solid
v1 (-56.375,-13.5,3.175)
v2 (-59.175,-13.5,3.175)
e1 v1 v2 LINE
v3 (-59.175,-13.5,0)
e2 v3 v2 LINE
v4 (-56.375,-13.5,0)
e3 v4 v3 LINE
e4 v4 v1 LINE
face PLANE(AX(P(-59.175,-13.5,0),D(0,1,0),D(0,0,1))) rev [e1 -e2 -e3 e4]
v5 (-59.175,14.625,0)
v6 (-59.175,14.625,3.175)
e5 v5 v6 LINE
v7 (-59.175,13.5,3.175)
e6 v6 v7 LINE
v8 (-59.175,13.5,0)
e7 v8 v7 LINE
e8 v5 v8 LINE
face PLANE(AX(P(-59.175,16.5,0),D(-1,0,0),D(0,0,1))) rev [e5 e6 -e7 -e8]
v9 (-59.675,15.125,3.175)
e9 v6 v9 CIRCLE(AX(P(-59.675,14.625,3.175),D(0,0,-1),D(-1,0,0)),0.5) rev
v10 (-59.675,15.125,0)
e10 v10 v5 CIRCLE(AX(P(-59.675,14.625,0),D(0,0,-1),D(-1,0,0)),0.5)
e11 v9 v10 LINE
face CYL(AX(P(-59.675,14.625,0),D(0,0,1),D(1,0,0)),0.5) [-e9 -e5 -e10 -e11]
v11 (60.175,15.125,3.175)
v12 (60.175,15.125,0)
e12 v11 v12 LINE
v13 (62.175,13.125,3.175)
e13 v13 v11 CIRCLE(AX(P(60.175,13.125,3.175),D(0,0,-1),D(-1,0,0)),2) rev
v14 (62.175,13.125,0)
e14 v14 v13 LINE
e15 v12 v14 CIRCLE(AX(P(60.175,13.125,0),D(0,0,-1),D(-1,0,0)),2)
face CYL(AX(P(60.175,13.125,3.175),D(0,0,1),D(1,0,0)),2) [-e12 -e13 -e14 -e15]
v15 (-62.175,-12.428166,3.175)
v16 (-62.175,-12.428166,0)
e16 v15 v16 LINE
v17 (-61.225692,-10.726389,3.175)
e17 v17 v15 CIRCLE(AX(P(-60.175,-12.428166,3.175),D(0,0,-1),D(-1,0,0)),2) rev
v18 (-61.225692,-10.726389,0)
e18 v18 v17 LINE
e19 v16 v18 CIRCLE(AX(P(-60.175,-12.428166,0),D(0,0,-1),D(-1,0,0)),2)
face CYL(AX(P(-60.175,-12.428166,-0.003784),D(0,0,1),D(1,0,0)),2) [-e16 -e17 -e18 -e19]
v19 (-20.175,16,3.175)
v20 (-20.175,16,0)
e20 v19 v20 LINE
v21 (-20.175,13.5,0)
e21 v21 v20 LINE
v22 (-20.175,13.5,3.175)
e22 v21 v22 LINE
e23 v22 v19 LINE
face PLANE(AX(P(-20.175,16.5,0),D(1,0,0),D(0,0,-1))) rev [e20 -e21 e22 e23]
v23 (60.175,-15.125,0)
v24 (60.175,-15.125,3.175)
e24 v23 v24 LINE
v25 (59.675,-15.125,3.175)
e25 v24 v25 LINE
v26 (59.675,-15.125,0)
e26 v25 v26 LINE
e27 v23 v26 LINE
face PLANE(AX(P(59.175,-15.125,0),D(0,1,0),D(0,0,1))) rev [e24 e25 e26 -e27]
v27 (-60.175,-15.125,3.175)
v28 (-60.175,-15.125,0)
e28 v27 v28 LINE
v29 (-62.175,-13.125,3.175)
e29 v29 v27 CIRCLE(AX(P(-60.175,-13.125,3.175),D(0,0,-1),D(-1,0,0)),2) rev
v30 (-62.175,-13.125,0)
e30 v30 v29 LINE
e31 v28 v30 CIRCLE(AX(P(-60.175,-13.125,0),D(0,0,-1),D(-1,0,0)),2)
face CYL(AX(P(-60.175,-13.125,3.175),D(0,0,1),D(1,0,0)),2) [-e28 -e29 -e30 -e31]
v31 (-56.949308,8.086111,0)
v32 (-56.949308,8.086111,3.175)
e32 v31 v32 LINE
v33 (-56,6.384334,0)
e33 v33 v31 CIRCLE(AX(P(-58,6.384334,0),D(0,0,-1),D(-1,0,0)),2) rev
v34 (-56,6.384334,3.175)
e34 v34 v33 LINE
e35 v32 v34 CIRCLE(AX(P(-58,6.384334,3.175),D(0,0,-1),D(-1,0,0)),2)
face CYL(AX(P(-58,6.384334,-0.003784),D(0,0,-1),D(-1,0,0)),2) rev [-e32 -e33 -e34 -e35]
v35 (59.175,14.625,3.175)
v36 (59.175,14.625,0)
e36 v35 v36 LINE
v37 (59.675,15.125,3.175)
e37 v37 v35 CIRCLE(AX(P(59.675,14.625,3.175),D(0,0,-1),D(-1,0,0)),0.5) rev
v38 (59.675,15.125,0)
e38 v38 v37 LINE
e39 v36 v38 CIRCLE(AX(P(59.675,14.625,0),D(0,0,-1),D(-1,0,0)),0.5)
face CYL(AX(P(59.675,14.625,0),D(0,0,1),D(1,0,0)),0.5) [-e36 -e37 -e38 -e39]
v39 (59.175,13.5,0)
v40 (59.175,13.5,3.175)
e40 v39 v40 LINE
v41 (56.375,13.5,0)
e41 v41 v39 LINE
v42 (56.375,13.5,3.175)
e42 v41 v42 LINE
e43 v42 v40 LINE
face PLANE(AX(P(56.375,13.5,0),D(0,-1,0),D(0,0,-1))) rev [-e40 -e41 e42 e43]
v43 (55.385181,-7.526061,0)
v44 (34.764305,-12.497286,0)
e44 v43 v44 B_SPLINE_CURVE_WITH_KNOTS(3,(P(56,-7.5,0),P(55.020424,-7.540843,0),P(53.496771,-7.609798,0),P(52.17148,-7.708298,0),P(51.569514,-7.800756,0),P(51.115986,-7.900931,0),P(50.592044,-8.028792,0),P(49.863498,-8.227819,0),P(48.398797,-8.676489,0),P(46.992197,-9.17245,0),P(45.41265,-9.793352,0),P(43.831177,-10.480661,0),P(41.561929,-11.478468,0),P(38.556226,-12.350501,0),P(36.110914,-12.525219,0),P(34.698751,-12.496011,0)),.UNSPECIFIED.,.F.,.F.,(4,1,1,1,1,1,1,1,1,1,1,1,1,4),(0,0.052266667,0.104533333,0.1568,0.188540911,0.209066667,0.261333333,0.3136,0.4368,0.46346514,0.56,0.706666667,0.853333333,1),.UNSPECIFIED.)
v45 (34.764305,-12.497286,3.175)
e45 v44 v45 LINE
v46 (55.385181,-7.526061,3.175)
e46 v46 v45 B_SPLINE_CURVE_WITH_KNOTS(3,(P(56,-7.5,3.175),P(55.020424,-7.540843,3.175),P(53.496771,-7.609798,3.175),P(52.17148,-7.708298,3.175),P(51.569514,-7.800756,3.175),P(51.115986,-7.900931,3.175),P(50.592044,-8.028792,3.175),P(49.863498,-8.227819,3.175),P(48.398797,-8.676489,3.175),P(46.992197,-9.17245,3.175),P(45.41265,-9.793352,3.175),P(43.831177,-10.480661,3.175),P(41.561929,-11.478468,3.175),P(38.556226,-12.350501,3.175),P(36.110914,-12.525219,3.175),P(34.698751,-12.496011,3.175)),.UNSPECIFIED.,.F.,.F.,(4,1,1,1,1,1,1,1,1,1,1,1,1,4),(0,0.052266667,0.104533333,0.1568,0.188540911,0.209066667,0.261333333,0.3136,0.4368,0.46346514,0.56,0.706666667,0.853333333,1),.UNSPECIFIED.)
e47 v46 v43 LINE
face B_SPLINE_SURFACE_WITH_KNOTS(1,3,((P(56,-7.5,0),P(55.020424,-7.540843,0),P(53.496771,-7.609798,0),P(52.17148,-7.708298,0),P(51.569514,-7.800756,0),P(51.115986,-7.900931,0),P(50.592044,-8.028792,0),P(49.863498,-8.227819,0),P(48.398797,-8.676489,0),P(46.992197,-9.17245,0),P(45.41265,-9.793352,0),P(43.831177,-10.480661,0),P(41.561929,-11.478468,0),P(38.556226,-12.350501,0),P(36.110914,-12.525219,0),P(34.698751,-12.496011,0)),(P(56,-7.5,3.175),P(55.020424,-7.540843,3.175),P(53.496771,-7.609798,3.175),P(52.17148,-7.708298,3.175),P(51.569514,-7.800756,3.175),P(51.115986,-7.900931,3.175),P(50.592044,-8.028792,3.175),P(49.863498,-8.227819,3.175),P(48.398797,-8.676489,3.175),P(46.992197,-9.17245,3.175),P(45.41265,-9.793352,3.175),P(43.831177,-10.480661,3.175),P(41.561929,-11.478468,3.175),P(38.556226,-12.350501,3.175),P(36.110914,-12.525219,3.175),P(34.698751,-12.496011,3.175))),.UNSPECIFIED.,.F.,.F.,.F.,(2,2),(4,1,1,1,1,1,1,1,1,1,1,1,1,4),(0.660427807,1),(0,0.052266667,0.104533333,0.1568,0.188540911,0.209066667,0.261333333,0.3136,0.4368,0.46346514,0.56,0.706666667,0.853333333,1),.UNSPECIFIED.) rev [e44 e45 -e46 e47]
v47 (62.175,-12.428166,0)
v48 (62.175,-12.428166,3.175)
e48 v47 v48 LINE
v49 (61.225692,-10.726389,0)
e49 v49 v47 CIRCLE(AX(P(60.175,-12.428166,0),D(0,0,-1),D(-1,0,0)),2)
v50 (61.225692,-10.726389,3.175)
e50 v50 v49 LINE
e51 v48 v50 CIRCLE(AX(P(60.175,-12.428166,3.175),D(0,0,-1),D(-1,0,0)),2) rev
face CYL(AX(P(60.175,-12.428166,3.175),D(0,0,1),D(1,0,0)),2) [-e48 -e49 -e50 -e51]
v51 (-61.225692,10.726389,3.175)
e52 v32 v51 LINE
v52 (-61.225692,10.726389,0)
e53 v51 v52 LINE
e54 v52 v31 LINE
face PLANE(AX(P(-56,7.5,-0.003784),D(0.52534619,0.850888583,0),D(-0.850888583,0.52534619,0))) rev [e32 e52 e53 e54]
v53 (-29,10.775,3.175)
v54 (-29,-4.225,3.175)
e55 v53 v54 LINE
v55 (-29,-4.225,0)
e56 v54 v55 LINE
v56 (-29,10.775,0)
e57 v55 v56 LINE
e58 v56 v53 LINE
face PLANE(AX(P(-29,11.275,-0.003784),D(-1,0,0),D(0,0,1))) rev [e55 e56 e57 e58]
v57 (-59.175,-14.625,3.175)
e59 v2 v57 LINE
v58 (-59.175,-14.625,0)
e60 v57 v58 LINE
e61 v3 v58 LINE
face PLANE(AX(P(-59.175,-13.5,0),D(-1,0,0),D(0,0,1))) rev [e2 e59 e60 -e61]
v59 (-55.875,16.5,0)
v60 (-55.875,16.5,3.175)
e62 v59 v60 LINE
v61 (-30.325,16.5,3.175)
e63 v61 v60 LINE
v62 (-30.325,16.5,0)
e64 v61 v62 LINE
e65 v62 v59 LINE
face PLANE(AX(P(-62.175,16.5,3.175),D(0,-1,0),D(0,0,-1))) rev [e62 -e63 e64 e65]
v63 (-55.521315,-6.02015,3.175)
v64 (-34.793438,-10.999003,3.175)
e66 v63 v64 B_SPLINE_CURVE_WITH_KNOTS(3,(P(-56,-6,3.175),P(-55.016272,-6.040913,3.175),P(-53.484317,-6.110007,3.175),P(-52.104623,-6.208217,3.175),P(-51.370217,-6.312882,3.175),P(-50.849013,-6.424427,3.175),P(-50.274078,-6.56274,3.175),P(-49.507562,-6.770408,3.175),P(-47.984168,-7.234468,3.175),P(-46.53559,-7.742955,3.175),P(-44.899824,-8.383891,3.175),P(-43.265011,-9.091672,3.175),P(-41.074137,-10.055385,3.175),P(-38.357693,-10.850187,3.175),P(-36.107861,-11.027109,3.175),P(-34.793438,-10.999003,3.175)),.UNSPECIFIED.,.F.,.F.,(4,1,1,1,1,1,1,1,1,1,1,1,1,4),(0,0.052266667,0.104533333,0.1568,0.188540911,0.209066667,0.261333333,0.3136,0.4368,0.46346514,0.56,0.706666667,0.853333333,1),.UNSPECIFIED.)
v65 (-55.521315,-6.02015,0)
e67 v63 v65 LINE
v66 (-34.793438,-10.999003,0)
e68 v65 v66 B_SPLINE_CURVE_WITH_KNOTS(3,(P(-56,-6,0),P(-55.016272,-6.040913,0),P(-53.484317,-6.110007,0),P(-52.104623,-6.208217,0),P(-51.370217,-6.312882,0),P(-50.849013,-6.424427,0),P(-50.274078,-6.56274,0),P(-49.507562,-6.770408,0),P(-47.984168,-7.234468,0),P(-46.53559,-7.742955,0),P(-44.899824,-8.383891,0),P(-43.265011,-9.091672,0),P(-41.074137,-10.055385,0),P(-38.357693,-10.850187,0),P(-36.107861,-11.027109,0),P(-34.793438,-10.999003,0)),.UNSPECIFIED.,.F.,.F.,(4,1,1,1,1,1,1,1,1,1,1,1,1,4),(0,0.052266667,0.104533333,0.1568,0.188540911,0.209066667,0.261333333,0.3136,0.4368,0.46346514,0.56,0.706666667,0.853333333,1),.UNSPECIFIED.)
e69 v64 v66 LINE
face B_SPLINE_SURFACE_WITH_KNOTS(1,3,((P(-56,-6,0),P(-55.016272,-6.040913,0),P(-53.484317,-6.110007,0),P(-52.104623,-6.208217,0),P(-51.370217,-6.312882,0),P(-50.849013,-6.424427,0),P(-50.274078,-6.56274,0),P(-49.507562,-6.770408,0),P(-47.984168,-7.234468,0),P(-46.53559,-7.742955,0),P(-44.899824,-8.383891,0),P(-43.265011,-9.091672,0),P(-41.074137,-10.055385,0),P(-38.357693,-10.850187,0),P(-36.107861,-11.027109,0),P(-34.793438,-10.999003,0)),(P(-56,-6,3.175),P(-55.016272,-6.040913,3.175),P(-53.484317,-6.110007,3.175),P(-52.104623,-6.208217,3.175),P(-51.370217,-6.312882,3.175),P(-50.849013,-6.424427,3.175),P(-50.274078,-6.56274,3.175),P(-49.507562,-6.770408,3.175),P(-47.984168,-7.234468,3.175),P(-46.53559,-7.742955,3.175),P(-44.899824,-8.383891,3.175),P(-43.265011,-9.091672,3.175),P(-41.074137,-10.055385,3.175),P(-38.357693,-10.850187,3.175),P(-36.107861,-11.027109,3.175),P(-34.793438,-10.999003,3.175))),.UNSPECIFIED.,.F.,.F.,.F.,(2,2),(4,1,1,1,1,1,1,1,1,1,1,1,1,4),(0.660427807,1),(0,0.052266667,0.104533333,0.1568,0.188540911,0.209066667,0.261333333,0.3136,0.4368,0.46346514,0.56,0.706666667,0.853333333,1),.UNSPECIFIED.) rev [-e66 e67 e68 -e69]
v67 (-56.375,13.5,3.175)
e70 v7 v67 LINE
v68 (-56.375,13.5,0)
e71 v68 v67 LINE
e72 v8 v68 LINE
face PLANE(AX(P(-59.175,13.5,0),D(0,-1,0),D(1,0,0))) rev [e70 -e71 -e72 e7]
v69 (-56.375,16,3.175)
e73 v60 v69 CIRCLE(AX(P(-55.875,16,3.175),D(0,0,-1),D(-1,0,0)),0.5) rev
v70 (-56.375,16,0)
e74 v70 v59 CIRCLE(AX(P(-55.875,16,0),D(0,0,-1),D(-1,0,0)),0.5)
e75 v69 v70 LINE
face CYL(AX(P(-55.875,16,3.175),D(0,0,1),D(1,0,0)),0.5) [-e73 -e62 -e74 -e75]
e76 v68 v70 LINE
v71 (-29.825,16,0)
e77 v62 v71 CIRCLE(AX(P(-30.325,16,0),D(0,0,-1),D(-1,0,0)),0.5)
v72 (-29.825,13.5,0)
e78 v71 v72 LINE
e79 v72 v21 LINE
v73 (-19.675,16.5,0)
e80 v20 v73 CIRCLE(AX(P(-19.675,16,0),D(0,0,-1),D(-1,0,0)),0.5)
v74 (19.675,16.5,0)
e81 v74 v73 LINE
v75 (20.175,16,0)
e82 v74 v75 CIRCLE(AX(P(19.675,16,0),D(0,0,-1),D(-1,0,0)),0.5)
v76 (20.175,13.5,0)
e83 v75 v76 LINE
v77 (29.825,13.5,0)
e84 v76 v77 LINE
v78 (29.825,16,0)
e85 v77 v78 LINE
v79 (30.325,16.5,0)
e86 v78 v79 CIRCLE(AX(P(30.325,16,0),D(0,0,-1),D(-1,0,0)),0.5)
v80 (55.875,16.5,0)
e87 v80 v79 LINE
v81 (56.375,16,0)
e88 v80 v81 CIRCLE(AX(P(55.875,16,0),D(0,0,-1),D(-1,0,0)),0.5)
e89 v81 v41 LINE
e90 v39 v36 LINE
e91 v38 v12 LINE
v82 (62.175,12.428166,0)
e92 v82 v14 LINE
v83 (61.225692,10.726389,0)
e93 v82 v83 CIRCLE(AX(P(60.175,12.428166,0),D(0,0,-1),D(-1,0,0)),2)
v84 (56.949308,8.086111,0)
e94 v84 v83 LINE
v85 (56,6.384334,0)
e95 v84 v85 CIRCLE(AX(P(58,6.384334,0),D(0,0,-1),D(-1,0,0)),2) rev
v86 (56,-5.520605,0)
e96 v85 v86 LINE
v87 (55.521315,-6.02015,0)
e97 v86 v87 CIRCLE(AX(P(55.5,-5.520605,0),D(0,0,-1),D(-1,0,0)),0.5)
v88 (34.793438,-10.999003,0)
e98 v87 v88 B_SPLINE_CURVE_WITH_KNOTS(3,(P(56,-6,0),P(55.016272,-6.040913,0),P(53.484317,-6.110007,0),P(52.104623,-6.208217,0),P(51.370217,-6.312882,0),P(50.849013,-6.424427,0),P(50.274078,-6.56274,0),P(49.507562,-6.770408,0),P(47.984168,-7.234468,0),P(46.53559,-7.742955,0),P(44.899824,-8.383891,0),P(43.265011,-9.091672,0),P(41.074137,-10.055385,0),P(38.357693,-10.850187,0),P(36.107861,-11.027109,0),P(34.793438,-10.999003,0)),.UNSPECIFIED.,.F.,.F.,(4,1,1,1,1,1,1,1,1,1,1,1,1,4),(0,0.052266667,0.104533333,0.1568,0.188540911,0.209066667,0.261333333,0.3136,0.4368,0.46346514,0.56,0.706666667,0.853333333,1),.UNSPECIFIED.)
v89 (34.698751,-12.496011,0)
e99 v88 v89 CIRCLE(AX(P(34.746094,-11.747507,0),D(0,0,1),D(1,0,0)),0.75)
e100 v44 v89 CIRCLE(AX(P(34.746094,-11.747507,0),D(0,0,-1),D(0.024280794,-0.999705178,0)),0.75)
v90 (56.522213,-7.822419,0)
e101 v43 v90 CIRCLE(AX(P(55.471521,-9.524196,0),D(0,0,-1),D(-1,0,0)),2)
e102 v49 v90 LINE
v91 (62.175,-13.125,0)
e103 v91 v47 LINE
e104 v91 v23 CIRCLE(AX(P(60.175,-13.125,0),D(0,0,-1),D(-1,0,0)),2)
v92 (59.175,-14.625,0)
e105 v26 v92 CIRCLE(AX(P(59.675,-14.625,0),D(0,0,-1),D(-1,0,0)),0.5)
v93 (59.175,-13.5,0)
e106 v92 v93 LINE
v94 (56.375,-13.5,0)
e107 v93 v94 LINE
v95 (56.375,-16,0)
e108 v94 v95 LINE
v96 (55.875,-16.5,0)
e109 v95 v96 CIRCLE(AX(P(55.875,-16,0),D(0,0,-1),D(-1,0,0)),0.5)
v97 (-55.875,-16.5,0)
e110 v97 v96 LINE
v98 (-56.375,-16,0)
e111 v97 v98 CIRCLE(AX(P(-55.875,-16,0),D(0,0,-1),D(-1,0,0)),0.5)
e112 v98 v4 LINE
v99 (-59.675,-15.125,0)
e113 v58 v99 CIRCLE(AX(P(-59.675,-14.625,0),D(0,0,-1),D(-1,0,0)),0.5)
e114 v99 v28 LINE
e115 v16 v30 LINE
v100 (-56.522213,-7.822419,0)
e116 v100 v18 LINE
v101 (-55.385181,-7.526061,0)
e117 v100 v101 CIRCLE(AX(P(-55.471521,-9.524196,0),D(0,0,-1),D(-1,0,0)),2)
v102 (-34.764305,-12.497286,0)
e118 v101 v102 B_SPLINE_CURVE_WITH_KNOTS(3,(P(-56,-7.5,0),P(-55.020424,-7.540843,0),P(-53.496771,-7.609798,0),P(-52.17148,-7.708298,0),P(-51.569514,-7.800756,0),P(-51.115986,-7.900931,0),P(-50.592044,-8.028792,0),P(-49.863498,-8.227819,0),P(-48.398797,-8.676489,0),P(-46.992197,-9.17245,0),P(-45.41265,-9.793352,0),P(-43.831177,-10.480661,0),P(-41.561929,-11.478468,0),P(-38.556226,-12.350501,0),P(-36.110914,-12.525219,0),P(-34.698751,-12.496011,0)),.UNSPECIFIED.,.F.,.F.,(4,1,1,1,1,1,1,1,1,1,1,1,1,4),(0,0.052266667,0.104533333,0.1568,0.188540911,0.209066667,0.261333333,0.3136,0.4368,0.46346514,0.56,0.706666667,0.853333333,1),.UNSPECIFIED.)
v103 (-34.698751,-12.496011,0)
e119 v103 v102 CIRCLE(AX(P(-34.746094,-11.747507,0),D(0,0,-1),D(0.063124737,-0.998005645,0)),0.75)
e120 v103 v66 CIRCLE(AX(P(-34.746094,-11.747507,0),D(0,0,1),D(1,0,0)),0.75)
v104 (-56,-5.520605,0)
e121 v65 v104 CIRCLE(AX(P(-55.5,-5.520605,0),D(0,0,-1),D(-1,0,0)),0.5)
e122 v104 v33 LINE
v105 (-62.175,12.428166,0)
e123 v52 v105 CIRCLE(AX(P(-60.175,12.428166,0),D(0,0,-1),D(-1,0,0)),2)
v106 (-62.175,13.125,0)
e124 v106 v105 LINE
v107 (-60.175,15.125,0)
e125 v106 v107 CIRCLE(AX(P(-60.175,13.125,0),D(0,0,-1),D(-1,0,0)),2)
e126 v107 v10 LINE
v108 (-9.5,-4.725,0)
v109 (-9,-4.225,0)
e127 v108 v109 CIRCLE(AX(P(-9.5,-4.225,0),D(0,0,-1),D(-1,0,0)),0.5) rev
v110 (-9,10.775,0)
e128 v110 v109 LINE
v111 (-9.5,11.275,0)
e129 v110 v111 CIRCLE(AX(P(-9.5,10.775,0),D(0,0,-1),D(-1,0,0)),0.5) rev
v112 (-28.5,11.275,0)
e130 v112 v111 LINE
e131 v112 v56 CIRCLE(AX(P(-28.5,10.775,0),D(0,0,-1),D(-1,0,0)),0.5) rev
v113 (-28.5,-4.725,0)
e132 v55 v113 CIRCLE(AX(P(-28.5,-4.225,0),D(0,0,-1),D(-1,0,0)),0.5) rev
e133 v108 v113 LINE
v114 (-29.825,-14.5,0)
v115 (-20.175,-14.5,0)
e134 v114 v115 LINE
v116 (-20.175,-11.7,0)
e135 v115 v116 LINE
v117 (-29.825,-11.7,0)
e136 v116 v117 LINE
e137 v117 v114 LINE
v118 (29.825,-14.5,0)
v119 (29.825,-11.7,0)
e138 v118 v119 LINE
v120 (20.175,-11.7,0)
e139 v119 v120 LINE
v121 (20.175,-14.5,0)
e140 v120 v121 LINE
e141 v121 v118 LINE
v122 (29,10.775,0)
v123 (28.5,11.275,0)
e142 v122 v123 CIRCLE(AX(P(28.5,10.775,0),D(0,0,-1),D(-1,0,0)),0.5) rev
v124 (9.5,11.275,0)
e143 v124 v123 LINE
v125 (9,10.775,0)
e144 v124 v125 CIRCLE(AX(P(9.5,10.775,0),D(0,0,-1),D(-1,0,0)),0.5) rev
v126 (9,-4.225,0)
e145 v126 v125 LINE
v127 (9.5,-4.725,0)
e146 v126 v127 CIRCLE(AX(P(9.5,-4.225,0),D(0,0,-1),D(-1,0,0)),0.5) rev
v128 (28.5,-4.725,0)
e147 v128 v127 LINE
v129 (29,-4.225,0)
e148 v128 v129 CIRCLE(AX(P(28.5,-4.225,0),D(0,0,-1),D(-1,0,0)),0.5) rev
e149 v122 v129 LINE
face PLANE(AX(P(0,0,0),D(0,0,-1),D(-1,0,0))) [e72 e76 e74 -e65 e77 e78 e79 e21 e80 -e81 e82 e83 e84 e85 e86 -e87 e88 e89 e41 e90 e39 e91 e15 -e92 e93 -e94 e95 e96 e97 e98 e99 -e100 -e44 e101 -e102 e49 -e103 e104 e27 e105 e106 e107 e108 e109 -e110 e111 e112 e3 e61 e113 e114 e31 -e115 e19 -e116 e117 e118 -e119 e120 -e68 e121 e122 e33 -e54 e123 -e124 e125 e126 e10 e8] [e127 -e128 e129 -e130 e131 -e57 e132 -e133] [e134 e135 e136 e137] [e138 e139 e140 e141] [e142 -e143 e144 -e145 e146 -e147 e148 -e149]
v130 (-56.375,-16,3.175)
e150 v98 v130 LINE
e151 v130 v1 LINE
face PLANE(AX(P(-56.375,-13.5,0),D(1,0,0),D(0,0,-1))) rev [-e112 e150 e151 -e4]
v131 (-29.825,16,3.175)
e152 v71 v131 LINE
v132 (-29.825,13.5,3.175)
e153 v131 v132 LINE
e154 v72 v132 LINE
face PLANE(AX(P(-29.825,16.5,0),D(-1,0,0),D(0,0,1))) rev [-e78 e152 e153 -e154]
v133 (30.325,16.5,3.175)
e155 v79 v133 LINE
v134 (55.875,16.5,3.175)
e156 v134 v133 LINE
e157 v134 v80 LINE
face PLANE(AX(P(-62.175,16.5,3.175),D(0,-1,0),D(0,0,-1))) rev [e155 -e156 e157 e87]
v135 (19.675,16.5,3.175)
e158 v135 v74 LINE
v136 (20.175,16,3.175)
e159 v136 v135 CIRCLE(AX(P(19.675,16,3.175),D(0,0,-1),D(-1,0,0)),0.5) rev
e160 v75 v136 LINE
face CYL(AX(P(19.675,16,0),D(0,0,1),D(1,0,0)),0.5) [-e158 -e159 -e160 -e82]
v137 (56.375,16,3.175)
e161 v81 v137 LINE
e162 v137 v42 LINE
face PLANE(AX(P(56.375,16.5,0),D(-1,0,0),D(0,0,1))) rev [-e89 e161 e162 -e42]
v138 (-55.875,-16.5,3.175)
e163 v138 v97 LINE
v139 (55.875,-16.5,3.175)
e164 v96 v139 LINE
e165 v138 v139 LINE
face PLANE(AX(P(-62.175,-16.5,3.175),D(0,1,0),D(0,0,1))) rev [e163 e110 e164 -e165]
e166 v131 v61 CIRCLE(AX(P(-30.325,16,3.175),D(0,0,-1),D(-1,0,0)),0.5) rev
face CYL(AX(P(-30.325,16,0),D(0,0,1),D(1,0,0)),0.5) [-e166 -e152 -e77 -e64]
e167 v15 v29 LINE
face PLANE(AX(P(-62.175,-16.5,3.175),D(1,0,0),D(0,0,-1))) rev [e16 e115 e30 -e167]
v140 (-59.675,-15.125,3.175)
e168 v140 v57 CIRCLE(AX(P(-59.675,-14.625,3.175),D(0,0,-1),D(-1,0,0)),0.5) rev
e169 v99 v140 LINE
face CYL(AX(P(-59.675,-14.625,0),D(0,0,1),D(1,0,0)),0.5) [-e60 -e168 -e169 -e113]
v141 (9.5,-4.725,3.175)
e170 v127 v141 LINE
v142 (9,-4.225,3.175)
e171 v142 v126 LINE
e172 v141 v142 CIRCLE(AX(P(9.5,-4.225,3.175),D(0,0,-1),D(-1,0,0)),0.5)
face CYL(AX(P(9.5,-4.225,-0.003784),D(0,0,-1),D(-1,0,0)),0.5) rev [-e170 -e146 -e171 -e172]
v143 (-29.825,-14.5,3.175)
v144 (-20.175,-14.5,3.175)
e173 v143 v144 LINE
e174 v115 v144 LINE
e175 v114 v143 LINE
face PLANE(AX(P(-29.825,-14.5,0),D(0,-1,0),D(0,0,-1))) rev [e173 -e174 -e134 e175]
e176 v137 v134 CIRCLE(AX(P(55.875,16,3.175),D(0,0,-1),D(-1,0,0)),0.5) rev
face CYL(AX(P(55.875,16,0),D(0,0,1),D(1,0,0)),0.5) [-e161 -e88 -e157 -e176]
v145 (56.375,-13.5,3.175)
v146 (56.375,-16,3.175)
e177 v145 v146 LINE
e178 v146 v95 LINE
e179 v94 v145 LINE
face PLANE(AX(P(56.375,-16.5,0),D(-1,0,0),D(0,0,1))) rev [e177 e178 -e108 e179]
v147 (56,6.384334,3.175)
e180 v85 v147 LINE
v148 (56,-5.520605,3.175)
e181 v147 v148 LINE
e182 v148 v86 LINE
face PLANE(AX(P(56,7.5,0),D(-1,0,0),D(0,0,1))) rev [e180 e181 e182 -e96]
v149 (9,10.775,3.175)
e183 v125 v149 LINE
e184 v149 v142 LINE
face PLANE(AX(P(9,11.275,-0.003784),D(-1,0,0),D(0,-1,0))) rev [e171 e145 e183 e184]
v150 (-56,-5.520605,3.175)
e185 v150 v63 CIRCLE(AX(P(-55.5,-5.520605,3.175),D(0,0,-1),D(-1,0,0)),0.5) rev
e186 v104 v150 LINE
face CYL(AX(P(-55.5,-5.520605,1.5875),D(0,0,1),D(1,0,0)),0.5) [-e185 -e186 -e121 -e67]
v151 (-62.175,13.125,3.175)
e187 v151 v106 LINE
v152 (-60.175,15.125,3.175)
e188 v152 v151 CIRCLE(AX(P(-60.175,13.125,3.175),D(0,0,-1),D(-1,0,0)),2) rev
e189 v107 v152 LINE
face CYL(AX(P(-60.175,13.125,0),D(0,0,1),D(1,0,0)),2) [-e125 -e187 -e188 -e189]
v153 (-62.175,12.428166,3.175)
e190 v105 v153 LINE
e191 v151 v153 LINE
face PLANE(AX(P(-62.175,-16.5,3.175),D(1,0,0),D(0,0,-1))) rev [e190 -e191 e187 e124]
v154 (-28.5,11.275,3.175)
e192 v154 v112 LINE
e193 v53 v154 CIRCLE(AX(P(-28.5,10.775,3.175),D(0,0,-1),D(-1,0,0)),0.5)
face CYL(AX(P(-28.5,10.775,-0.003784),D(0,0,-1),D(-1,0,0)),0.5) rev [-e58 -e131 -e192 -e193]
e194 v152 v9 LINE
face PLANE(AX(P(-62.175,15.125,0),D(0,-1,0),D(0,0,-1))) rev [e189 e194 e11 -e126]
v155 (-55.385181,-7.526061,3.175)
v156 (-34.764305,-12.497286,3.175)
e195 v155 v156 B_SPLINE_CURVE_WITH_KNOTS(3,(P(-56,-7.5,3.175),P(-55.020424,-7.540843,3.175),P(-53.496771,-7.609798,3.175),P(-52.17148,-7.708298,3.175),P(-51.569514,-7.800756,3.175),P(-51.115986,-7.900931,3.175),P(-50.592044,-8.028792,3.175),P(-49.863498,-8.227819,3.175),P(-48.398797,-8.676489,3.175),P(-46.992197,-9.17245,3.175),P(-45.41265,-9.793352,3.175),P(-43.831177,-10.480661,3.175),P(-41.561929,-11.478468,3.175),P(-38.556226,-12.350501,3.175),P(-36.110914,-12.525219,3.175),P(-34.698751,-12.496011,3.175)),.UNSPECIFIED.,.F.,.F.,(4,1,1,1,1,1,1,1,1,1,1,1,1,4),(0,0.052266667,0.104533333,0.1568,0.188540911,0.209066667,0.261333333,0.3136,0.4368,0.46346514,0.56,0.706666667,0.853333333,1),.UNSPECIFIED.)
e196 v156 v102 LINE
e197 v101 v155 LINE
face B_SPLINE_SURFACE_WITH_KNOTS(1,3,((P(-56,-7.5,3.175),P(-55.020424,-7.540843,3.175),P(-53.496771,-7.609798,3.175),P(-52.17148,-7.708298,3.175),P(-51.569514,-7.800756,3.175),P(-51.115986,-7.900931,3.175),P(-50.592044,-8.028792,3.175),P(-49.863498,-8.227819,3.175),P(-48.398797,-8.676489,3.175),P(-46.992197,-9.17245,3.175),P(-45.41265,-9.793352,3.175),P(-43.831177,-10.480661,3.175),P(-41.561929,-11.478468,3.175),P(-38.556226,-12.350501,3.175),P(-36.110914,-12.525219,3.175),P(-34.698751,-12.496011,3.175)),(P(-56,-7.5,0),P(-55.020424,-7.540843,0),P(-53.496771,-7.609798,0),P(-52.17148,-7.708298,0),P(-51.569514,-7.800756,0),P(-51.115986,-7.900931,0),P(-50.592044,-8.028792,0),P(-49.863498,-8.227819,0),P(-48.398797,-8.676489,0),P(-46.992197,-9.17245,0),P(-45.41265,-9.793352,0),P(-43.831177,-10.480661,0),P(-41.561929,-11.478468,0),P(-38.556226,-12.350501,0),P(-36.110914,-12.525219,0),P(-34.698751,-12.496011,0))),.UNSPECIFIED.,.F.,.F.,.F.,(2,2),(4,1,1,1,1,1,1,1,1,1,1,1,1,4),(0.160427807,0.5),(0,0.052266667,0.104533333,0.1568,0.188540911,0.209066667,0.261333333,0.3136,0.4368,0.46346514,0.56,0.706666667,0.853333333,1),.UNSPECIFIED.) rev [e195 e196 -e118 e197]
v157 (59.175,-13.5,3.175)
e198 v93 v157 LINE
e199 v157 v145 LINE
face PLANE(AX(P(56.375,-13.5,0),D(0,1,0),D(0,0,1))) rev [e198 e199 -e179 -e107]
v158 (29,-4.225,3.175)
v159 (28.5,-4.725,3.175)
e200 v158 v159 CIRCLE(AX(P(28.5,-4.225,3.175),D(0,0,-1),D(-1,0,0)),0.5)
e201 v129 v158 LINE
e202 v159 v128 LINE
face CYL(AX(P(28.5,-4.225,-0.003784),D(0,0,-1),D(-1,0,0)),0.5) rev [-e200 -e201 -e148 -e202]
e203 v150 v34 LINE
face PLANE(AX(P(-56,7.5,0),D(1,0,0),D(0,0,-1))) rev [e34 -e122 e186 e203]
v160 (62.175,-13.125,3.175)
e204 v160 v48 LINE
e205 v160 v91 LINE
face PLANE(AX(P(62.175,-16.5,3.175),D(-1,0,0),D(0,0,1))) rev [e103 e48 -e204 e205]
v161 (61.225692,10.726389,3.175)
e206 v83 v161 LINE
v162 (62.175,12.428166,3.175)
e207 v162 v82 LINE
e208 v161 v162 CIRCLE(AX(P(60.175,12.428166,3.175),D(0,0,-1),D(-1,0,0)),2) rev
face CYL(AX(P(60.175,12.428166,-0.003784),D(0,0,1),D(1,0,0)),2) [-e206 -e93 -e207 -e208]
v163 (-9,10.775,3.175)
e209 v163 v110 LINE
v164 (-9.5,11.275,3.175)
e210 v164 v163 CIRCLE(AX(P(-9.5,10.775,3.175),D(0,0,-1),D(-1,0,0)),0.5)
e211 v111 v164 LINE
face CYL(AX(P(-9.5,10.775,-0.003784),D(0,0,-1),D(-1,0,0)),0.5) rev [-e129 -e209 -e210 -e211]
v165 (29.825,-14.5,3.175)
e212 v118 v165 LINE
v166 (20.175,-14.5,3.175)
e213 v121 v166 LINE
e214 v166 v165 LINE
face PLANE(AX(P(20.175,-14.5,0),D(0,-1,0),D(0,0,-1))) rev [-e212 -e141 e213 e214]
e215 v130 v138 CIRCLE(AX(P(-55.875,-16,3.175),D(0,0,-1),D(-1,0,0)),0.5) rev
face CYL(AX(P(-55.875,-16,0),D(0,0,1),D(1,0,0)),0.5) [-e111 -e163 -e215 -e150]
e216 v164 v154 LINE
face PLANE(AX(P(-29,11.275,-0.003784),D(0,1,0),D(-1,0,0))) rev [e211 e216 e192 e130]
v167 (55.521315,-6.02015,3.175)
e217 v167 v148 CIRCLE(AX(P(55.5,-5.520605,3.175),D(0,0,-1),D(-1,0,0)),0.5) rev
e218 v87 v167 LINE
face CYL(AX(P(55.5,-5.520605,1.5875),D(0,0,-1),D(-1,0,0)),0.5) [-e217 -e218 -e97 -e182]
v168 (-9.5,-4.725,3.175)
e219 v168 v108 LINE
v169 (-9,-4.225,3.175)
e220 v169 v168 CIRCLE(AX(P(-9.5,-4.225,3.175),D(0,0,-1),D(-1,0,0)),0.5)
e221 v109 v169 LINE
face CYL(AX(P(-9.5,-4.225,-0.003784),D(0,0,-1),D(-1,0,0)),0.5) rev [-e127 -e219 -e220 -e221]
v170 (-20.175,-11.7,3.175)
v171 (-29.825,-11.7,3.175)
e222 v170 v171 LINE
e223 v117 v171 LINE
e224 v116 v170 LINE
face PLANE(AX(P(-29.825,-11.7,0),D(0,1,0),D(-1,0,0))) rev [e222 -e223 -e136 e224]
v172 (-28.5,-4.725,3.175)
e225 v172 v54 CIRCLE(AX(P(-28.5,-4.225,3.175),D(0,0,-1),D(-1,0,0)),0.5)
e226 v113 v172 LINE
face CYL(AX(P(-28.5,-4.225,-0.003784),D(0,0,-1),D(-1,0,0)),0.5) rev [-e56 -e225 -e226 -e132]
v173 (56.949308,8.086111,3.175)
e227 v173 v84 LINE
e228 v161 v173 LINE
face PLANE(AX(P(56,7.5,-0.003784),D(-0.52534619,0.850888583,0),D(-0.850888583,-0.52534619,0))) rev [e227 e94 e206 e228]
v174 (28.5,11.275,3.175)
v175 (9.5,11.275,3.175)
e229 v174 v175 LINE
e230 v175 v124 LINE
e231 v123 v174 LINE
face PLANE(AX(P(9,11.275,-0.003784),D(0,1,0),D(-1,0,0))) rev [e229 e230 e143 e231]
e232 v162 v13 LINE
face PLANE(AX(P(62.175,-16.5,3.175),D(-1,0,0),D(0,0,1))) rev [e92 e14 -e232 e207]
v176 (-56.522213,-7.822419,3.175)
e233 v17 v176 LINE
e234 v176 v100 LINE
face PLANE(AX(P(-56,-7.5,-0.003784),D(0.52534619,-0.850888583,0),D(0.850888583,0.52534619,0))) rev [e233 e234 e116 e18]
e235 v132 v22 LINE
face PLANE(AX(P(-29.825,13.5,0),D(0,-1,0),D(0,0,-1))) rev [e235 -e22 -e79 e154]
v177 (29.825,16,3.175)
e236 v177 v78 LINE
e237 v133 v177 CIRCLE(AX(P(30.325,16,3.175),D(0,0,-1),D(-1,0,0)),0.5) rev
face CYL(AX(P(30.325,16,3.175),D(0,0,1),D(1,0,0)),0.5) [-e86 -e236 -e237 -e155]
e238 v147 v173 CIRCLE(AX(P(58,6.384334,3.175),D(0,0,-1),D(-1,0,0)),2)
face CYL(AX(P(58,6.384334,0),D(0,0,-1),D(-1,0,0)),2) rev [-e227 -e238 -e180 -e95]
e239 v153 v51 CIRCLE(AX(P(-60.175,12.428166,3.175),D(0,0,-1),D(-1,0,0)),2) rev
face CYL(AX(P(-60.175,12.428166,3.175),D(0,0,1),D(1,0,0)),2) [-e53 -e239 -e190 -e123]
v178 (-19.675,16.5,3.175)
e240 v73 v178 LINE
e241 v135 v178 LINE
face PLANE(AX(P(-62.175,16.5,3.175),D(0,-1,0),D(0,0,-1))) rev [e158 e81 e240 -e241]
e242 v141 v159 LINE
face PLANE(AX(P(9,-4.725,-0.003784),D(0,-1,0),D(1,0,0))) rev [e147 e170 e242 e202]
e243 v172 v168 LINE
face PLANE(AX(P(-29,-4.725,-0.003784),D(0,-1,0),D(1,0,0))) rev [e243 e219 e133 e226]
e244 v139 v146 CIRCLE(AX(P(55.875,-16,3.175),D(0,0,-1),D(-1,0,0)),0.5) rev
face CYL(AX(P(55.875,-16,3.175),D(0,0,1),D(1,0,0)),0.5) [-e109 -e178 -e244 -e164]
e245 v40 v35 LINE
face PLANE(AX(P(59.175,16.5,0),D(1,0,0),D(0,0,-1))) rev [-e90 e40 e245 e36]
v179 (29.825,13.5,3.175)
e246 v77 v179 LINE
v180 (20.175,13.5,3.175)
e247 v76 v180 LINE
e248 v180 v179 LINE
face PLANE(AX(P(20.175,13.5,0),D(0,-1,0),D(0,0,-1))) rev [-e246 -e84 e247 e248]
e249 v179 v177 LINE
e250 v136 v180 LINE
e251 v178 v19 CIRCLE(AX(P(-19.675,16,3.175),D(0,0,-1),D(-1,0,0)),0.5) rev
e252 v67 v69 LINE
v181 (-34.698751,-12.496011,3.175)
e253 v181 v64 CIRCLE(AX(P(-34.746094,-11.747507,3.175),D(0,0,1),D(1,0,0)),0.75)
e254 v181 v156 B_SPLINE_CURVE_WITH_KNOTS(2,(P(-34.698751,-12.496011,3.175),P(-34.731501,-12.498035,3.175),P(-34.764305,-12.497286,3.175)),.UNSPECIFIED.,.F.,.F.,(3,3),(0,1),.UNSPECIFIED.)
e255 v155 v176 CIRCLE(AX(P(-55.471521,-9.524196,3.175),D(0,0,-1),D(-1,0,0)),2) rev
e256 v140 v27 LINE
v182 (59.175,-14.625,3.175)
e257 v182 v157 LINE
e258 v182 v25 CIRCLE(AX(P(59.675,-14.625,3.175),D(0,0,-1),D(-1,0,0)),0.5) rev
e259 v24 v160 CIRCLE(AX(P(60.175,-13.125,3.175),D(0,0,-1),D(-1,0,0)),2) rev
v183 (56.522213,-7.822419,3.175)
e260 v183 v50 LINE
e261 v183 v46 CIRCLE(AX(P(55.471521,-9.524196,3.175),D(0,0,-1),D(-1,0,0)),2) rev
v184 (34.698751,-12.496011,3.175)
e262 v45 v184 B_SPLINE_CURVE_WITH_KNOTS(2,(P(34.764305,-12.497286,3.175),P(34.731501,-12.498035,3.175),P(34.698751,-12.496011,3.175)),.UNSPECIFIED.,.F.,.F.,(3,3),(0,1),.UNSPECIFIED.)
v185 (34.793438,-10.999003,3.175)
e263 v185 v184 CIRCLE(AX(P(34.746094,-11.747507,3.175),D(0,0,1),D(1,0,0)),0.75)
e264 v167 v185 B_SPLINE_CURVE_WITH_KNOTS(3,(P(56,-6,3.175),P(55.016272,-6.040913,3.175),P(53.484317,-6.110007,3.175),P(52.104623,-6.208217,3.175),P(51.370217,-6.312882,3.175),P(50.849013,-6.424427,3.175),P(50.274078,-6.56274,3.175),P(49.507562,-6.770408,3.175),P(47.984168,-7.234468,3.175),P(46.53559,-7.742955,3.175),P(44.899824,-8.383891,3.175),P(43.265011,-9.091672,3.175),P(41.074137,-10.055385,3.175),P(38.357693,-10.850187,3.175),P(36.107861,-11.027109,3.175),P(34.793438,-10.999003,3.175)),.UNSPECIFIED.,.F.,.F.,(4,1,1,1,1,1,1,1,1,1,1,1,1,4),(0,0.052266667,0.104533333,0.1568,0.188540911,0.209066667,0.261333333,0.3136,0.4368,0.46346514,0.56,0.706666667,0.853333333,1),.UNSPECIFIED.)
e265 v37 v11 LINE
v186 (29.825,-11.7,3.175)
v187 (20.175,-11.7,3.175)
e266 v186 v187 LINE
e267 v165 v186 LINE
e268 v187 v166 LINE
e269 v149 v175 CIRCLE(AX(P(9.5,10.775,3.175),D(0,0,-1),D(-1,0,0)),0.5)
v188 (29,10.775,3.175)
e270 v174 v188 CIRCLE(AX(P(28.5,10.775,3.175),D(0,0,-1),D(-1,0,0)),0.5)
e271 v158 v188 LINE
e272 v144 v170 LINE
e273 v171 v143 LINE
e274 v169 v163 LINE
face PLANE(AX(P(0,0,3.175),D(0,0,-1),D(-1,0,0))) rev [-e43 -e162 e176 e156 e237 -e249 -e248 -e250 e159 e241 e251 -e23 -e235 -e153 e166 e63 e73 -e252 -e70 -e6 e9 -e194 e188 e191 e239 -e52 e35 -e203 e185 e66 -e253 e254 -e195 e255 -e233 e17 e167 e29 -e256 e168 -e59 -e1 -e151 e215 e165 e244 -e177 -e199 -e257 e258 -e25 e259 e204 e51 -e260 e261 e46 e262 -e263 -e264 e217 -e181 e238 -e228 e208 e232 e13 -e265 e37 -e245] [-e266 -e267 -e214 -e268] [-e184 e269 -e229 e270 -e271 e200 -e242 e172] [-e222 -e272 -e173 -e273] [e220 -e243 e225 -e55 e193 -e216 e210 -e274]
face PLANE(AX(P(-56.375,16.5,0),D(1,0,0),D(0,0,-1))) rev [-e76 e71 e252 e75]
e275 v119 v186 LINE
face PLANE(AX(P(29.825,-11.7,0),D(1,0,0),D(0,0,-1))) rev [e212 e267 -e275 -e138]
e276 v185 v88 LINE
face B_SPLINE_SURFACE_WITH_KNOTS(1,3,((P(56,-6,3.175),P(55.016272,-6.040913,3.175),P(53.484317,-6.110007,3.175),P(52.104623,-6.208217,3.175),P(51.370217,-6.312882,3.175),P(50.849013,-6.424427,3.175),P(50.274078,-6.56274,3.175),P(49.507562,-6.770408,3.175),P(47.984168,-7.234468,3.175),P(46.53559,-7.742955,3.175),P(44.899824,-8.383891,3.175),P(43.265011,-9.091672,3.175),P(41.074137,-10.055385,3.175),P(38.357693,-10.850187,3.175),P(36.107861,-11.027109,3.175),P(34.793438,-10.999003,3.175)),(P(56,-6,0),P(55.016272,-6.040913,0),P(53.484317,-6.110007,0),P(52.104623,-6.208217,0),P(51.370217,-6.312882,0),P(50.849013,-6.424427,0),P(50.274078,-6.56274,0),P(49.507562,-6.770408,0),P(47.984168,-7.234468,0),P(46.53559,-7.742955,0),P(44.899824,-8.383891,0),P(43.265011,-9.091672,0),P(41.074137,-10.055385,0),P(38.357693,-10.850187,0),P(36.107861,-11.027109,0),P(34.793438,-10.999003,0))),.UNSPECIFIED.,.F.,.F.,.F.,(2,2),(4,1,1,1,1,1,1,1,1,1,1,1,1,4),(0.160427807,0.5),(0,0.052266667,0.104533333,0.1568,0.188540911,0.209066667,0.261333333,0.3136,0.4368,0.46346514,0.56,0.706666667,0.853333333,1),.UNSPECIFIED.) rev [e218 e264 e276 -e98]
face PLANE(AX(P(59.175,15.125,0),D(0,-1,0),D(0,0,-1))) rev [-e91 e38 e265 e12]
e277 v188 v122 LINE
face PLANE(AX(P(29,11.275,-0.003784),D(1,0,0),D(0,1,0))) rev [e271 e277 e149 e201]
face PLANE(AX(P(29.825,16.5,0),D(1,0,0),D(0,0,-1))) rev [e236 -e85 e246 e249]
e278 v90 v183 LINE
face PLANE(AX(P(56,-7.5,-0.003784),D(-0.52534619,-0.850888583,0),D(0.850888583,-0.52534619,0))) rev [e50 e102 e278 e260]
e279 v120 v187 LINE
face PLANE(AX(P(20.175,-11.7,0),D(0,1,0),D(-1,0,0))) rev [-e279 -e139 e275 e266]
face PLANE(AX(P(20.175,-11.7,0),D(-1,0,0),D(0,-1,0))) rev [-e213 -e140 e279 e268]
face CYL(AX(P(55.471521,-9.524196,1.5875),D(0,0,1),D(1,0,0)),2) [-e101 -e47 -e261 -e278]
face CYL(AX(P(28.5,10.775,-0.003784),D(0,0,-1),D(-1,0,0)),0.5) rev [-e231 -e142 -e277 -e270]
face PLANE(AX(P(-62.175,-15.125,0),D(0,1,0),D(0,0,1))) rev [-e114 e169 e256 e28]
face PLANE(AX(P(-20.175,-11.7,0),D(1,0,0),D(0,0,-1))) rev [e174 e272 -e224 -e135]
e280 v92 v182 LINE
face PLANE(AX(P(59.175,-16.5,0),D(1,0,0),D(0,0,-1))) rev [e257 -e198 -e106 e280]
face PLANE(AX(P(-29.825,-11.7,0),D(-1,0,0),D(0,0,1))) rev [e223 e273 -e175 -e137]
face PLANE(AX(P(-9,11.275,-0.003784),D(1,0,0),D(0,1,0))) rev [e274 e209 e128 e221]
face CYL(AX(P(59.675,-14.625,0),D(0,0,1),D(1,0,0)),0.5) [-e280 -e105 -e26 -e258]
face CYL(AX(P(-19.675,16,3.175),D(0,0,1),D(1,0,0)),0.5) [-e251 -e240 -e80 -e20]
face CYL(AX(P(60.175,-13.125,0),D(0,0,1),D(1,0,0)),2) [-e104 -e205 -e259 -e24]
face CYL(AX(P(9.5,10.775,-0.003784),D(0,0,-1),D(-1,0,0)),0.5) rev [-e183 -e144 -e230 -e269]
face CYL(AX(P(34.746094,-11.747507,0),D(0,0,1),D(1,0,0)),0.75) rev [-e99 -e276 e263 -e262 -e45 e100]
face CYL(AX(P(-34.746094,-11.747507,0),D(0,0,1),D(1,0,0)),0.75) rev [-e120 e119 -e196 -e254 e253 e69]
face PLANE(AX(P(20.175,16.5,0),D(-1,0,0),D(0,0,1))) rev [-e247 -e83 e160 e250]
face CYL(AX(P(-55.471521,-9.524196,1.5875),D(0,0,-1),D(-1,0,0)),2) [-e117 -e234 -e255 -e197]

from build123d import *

# Parameters (mm, degrees)
SKETCH1_W           = 124.35
SKETCH1_H           = 33
BOSS_EXTRUDE1_DEPTH = 3.175
SKETCH2_W           = 9.65
SKETCH2_H           = 2.8
SKETCH2_H_2         = 3
CUT_EXTRUDE1_DEPTH  = 65.405444257
SKETCH4_W           = 2.8
SKETCH4_H           = 3
SKETCH4_W_2         = 6.175
SKETCH4_H_2         = 15
CUT_EXTRUDE2_DEPTH  = 65.405444257
SKETCH6_W           = 3
SKETCH6_H           = 1.375
CUT_EXTRUDE3_DEPTH  = 65.405444257
CUT_SWEEP1_DEPTH    = 3.175
SKETCH12_R          = 0.75
CUT_EXTRUDE6_DEPTH  = 65.405444385
CUT_EXTRUDE7_DEPTH  = 65.405444385
FILLET6_R           = 2
FILLET7_R           = 0.5
SKETCH15_W          = 20
SKETCH15_H          = 16
CUT_EXTRUDE9_DEPTH  = 65.405444385
FILLET9_R           = 0.5


# Read off the part's stored shape, not the designer's step: Cut-Sweep1
with BuildPart() as part:
    # Sketch1 → Boss-Extrude1 (new body)
    with BuildSketch(Plane.XY):
        Rectangle(SKETCH1_W, SKETCH1_H)
    extrude(amount=BOSS_EXTRUDE1_DEPTH)

    # Sketch2 → Cut-Extrude1 (cut, through all)
    with BuildSketch(Plane.XY.offset(3.175)):
        with Locations((-25, -13.1)):
            Rectangle(SKETCH2_W, SKETCH2_H)
        with Locations((25, -13.1)):
            Rectangle(SKETCH2_W, SKETCH2_H)
        with Locations((-25, 15)):
            Rectangle(SKETCH2_W, SKETCH2_H_2)
        with Locations((25, 15)):
            Rectangle(SKETCH2_W, SKETCH2_H_2)
    extrude(amount=-CUT_EXTRUDE1_DEPTH, mode=Mode.SUBTRACT)

    # Sketch4 → Cut-Extrude2 (cut, through all)
    with BuildSketch(Plane.XY.offset(3.175)):
        with Locations((-57.775, 15)):
            Rectangle(SKETCH4_W, SKETCH4_H)
        with Locations((-59.0875, 0)):
            Rectangle(SKETCH4_W_2, SKETCH4_H_2)
        with Locations((-57.775, -15)):
            Rectangle(SKETCH4_W, SKETCH4_H)
        with Locations((57.775, 15)):
            Rectangle(SKETCH4_W, SKETCH4_H)
        with Locations((59.0875, 0)):
            Rectangle(SKETCH4_W_2, SKETCH4_H_2)
        with Locations((57.775, -15)):
            Rectangle(SKETCH4_W, SKETCH4_H)
    extrude(amount=-CUT_EXTRUDE2_DEPTH, mode=Mode.SUBTRACT)

    # Sketch6 → Cut-Extrude3 (cut, through all)
    with BuildSketch(Plane.XY.offset(3.175)):
        with Locations((-60.675, 15.8125)):
            Rectangle(SKETCH6_W, SKETCH6_H)
        with Locations((-60.675, -15.8125)):
            Rectangle(SKETCH6_W, SKETCH6_H)
        with Locations((60.675, 15.8125)):
            Rectangle(SKETCH6_W, SKETCH6_H)
        with Locations((60.675, -15.8125)):
            Rectangle(SKETCH6_W, SKETCH6_H)
    extrude(amount=-CUT_EXTRUDE3_DEPTH, mode=Mode.SUBTRACT)

    # Cut-Sweep1 outline → Cut-Sweep1 (cut)
    with BuildSketch(Plane.XY):
        with BuildLine():
            add(Edge.make_bspline(
                [(-56, -6), (-55.016272395, -6.040912607), (-53.484317245, -6.110006936), (-52.10462272, -6.208217255), (-51.370216858, -6.312882143), (-50.849013323, -6.424427059), (-50.274077583, -6.562740427), (-49.507561658, -6.770408498), (-47.98416767, -7.234467607), (-46.535590196, -7.742954919), (-44.899823838, -8.383891144), (-43.265010906, -9.091671777), (-41.074137026, -10.055384808), (-38.357692762, -10.850187014), (-36.1078612, -11.027108547), (-34.793437631, -10.999002823)],
                knots=[0, 0, 0, 0, 0.052266667, 0.104533333, 0.1568, 0.188540911, 0.209066667, 0.261333333, 0.3136, 0.4368, 0.46346514, 0.56, 0.706666667, 0.853333333, 1, 1, 1, 1], degree=3))
            Line((-56, -6), (-56, -7.5))
            add(Edge.make_bspline(
                [(-56, -7.5), (-55.020423649, -7.540842864), (-53.496771007, -7.609797709), (-52.171479553, -7.70829789), (-51.569513747, -7.80075633), (-51.115986388, -7.900930823), (-50.592043829, -8.028791809), (-49.863497697, -8.22781936), (-48.398796638, -8.676488924), (-46.992197023, -9.172450468), (-45.412650318, -9.7933523), (-43.831176536, -10.480660701), (-41.561928867, -11.478467634), (-38.556226285, -12.350501385), (-36.110914304, -12.525218982), (-34.698750526, -12.49601129)],
                knots=[0, 0, 0, 0, 0.052266667, 0.104533333, 0.1568, 0.188540911, 0.209066667, 0.261333333, 0.3136, 0.4368, 0.46346514, 0.56, 0.706666667, 0.853333333, 1, 1, 1, 1], degree=3))
            Line((-34.698750526, -12.49601129), (-34.793437631, -10.999002823))
        make_face()
    cut_sweep1 = extrude(amount=CUT_SWEEP1_DEPTH, mode=Mode.SUBTRACT)

    # Mirror1: Cut-Sweep1 across plane
    add(cut_sweep1.mirror(Plane.ZY), mode=Mode.SUBTRACT)

    # Sketch12 → Cut-Extrude6 (cut, through all)
    with BuildSketch(Plane.XY.offset(3.175)):
        with Locations((-34.746094079, -11.747507056)):
            Circle(SKETCH12_R)
        with Locations((34.746094079, -11.747507056)):
            Circle(SKETCH12_R)
    extrude(amount=-CUT_EXTRUDE6_DEPTH, mode=Mode.SUBTRACT)

    # Sketch13 → Cut-Extrude7 (cut, through all)
    with BuildSketch(Plane.XY.offset(3.175)):
        Polygon((-56, 7.5), (-62.175, 11.3125), (-62.175, 7.5), align=None)
        Polygon((-56, -7.5), (-62.175, -11.3125), (-62.175, -7.5), align=None)
        Polygon((56, 7.5), (62.175, 11.3125), (62.175, 7.5), align=None)
        Polygon((56, -7.5), (62.175, -11.3125), (62.175, -7.5), align=None)
    extrude(amount=-CUT_EXTRUDE7_DEPTH, mode=Mode.SUBTRACT)

    # Fillet6
    fillet6_edges = [part.edges().sort_by_distance(p)[0] for p in [
        (62.175, -15.125, 1.5875),
        (62.175, -11.3125, 1.5875),
        (56, -7.5, 1.5875),
        (56, 7.5, 1.5875),
        (62.175, 11.3125, 1.5875),
        (62.175, 15.125, 1.5875),
        (-62.175, -15.125, 1.5875),
        (-62.175, -11.3125, 1.5875),
        (-56, -7.5, 1.5875),
        (-62.175, 15.125, 1.5875),
        (-62.175, 11.3125, 1.5875),
        (-56, 7.5, 1.5875),
    ]]
    fillet(fillet6_edges, radius=FILLET6_R)

    # Fillet7
    fillet7_edges = [part.edges().sort_by_distance(p)[0] for p in [
        (59.175, 15.125, 1.5875),
        (59.175, -15.125, 1.5875),
        (-59.175, -15.125, 1.5875),
        (-59.175, 15.125, 1.5875),
        (20.175, 16.5, 1.5875),
        (29.825, 16.5, 1.5875),
        (-20.175, 16.5, 1.5875),
        (-29.825, 16.5, 1.5875),
        (56.375, -16.5, 1.5875),
        (56, -6, 1.5875),
        (56.375, 16.5, 1.5875),
        (-56.375, 16.5, 1.5875),
        (-56.375, -16.5, 1.5875),
        (-56, -6, 1.5875),
    ]]
    fillet(fillet7_edges, radius=FILLET7_R)

    # Sketch15 → Cut-Extrude9 (cut, through all)
    with BuildSketch(Plane.XY.offset(3.175)):
        with Locations((-19, 3.275)):
            Rectangle(SKETCH15_W, SKETCH15_H)
        with Locations((19, 3.275)):
            Rectangle(SKETCH15_W, SKETCH15_H)
    extrude(amount=-CUT_EXTRUDE9_DEPTH, mode=Mode.SUBTRACT)

    # Fillet9
    fillet9_edges = [part.edges().sort_by_distance(p)[0] for p in [
        (-29, -4.725, 1.5875),
        (-29, 11.275, 1.5875),
        (-9, 11.275, 1.5875),
        (-9, -4.725, 1.5875),
        (9, -4.725, 1.5875),
        (9, 11.275, 1.5875),
        (29, 11.275, 1.5875),
        (29, -4.725, 1.5875),
    ]]
    fillet(fillet9_edges, radius=FILLET9_R)


solid = part.part
